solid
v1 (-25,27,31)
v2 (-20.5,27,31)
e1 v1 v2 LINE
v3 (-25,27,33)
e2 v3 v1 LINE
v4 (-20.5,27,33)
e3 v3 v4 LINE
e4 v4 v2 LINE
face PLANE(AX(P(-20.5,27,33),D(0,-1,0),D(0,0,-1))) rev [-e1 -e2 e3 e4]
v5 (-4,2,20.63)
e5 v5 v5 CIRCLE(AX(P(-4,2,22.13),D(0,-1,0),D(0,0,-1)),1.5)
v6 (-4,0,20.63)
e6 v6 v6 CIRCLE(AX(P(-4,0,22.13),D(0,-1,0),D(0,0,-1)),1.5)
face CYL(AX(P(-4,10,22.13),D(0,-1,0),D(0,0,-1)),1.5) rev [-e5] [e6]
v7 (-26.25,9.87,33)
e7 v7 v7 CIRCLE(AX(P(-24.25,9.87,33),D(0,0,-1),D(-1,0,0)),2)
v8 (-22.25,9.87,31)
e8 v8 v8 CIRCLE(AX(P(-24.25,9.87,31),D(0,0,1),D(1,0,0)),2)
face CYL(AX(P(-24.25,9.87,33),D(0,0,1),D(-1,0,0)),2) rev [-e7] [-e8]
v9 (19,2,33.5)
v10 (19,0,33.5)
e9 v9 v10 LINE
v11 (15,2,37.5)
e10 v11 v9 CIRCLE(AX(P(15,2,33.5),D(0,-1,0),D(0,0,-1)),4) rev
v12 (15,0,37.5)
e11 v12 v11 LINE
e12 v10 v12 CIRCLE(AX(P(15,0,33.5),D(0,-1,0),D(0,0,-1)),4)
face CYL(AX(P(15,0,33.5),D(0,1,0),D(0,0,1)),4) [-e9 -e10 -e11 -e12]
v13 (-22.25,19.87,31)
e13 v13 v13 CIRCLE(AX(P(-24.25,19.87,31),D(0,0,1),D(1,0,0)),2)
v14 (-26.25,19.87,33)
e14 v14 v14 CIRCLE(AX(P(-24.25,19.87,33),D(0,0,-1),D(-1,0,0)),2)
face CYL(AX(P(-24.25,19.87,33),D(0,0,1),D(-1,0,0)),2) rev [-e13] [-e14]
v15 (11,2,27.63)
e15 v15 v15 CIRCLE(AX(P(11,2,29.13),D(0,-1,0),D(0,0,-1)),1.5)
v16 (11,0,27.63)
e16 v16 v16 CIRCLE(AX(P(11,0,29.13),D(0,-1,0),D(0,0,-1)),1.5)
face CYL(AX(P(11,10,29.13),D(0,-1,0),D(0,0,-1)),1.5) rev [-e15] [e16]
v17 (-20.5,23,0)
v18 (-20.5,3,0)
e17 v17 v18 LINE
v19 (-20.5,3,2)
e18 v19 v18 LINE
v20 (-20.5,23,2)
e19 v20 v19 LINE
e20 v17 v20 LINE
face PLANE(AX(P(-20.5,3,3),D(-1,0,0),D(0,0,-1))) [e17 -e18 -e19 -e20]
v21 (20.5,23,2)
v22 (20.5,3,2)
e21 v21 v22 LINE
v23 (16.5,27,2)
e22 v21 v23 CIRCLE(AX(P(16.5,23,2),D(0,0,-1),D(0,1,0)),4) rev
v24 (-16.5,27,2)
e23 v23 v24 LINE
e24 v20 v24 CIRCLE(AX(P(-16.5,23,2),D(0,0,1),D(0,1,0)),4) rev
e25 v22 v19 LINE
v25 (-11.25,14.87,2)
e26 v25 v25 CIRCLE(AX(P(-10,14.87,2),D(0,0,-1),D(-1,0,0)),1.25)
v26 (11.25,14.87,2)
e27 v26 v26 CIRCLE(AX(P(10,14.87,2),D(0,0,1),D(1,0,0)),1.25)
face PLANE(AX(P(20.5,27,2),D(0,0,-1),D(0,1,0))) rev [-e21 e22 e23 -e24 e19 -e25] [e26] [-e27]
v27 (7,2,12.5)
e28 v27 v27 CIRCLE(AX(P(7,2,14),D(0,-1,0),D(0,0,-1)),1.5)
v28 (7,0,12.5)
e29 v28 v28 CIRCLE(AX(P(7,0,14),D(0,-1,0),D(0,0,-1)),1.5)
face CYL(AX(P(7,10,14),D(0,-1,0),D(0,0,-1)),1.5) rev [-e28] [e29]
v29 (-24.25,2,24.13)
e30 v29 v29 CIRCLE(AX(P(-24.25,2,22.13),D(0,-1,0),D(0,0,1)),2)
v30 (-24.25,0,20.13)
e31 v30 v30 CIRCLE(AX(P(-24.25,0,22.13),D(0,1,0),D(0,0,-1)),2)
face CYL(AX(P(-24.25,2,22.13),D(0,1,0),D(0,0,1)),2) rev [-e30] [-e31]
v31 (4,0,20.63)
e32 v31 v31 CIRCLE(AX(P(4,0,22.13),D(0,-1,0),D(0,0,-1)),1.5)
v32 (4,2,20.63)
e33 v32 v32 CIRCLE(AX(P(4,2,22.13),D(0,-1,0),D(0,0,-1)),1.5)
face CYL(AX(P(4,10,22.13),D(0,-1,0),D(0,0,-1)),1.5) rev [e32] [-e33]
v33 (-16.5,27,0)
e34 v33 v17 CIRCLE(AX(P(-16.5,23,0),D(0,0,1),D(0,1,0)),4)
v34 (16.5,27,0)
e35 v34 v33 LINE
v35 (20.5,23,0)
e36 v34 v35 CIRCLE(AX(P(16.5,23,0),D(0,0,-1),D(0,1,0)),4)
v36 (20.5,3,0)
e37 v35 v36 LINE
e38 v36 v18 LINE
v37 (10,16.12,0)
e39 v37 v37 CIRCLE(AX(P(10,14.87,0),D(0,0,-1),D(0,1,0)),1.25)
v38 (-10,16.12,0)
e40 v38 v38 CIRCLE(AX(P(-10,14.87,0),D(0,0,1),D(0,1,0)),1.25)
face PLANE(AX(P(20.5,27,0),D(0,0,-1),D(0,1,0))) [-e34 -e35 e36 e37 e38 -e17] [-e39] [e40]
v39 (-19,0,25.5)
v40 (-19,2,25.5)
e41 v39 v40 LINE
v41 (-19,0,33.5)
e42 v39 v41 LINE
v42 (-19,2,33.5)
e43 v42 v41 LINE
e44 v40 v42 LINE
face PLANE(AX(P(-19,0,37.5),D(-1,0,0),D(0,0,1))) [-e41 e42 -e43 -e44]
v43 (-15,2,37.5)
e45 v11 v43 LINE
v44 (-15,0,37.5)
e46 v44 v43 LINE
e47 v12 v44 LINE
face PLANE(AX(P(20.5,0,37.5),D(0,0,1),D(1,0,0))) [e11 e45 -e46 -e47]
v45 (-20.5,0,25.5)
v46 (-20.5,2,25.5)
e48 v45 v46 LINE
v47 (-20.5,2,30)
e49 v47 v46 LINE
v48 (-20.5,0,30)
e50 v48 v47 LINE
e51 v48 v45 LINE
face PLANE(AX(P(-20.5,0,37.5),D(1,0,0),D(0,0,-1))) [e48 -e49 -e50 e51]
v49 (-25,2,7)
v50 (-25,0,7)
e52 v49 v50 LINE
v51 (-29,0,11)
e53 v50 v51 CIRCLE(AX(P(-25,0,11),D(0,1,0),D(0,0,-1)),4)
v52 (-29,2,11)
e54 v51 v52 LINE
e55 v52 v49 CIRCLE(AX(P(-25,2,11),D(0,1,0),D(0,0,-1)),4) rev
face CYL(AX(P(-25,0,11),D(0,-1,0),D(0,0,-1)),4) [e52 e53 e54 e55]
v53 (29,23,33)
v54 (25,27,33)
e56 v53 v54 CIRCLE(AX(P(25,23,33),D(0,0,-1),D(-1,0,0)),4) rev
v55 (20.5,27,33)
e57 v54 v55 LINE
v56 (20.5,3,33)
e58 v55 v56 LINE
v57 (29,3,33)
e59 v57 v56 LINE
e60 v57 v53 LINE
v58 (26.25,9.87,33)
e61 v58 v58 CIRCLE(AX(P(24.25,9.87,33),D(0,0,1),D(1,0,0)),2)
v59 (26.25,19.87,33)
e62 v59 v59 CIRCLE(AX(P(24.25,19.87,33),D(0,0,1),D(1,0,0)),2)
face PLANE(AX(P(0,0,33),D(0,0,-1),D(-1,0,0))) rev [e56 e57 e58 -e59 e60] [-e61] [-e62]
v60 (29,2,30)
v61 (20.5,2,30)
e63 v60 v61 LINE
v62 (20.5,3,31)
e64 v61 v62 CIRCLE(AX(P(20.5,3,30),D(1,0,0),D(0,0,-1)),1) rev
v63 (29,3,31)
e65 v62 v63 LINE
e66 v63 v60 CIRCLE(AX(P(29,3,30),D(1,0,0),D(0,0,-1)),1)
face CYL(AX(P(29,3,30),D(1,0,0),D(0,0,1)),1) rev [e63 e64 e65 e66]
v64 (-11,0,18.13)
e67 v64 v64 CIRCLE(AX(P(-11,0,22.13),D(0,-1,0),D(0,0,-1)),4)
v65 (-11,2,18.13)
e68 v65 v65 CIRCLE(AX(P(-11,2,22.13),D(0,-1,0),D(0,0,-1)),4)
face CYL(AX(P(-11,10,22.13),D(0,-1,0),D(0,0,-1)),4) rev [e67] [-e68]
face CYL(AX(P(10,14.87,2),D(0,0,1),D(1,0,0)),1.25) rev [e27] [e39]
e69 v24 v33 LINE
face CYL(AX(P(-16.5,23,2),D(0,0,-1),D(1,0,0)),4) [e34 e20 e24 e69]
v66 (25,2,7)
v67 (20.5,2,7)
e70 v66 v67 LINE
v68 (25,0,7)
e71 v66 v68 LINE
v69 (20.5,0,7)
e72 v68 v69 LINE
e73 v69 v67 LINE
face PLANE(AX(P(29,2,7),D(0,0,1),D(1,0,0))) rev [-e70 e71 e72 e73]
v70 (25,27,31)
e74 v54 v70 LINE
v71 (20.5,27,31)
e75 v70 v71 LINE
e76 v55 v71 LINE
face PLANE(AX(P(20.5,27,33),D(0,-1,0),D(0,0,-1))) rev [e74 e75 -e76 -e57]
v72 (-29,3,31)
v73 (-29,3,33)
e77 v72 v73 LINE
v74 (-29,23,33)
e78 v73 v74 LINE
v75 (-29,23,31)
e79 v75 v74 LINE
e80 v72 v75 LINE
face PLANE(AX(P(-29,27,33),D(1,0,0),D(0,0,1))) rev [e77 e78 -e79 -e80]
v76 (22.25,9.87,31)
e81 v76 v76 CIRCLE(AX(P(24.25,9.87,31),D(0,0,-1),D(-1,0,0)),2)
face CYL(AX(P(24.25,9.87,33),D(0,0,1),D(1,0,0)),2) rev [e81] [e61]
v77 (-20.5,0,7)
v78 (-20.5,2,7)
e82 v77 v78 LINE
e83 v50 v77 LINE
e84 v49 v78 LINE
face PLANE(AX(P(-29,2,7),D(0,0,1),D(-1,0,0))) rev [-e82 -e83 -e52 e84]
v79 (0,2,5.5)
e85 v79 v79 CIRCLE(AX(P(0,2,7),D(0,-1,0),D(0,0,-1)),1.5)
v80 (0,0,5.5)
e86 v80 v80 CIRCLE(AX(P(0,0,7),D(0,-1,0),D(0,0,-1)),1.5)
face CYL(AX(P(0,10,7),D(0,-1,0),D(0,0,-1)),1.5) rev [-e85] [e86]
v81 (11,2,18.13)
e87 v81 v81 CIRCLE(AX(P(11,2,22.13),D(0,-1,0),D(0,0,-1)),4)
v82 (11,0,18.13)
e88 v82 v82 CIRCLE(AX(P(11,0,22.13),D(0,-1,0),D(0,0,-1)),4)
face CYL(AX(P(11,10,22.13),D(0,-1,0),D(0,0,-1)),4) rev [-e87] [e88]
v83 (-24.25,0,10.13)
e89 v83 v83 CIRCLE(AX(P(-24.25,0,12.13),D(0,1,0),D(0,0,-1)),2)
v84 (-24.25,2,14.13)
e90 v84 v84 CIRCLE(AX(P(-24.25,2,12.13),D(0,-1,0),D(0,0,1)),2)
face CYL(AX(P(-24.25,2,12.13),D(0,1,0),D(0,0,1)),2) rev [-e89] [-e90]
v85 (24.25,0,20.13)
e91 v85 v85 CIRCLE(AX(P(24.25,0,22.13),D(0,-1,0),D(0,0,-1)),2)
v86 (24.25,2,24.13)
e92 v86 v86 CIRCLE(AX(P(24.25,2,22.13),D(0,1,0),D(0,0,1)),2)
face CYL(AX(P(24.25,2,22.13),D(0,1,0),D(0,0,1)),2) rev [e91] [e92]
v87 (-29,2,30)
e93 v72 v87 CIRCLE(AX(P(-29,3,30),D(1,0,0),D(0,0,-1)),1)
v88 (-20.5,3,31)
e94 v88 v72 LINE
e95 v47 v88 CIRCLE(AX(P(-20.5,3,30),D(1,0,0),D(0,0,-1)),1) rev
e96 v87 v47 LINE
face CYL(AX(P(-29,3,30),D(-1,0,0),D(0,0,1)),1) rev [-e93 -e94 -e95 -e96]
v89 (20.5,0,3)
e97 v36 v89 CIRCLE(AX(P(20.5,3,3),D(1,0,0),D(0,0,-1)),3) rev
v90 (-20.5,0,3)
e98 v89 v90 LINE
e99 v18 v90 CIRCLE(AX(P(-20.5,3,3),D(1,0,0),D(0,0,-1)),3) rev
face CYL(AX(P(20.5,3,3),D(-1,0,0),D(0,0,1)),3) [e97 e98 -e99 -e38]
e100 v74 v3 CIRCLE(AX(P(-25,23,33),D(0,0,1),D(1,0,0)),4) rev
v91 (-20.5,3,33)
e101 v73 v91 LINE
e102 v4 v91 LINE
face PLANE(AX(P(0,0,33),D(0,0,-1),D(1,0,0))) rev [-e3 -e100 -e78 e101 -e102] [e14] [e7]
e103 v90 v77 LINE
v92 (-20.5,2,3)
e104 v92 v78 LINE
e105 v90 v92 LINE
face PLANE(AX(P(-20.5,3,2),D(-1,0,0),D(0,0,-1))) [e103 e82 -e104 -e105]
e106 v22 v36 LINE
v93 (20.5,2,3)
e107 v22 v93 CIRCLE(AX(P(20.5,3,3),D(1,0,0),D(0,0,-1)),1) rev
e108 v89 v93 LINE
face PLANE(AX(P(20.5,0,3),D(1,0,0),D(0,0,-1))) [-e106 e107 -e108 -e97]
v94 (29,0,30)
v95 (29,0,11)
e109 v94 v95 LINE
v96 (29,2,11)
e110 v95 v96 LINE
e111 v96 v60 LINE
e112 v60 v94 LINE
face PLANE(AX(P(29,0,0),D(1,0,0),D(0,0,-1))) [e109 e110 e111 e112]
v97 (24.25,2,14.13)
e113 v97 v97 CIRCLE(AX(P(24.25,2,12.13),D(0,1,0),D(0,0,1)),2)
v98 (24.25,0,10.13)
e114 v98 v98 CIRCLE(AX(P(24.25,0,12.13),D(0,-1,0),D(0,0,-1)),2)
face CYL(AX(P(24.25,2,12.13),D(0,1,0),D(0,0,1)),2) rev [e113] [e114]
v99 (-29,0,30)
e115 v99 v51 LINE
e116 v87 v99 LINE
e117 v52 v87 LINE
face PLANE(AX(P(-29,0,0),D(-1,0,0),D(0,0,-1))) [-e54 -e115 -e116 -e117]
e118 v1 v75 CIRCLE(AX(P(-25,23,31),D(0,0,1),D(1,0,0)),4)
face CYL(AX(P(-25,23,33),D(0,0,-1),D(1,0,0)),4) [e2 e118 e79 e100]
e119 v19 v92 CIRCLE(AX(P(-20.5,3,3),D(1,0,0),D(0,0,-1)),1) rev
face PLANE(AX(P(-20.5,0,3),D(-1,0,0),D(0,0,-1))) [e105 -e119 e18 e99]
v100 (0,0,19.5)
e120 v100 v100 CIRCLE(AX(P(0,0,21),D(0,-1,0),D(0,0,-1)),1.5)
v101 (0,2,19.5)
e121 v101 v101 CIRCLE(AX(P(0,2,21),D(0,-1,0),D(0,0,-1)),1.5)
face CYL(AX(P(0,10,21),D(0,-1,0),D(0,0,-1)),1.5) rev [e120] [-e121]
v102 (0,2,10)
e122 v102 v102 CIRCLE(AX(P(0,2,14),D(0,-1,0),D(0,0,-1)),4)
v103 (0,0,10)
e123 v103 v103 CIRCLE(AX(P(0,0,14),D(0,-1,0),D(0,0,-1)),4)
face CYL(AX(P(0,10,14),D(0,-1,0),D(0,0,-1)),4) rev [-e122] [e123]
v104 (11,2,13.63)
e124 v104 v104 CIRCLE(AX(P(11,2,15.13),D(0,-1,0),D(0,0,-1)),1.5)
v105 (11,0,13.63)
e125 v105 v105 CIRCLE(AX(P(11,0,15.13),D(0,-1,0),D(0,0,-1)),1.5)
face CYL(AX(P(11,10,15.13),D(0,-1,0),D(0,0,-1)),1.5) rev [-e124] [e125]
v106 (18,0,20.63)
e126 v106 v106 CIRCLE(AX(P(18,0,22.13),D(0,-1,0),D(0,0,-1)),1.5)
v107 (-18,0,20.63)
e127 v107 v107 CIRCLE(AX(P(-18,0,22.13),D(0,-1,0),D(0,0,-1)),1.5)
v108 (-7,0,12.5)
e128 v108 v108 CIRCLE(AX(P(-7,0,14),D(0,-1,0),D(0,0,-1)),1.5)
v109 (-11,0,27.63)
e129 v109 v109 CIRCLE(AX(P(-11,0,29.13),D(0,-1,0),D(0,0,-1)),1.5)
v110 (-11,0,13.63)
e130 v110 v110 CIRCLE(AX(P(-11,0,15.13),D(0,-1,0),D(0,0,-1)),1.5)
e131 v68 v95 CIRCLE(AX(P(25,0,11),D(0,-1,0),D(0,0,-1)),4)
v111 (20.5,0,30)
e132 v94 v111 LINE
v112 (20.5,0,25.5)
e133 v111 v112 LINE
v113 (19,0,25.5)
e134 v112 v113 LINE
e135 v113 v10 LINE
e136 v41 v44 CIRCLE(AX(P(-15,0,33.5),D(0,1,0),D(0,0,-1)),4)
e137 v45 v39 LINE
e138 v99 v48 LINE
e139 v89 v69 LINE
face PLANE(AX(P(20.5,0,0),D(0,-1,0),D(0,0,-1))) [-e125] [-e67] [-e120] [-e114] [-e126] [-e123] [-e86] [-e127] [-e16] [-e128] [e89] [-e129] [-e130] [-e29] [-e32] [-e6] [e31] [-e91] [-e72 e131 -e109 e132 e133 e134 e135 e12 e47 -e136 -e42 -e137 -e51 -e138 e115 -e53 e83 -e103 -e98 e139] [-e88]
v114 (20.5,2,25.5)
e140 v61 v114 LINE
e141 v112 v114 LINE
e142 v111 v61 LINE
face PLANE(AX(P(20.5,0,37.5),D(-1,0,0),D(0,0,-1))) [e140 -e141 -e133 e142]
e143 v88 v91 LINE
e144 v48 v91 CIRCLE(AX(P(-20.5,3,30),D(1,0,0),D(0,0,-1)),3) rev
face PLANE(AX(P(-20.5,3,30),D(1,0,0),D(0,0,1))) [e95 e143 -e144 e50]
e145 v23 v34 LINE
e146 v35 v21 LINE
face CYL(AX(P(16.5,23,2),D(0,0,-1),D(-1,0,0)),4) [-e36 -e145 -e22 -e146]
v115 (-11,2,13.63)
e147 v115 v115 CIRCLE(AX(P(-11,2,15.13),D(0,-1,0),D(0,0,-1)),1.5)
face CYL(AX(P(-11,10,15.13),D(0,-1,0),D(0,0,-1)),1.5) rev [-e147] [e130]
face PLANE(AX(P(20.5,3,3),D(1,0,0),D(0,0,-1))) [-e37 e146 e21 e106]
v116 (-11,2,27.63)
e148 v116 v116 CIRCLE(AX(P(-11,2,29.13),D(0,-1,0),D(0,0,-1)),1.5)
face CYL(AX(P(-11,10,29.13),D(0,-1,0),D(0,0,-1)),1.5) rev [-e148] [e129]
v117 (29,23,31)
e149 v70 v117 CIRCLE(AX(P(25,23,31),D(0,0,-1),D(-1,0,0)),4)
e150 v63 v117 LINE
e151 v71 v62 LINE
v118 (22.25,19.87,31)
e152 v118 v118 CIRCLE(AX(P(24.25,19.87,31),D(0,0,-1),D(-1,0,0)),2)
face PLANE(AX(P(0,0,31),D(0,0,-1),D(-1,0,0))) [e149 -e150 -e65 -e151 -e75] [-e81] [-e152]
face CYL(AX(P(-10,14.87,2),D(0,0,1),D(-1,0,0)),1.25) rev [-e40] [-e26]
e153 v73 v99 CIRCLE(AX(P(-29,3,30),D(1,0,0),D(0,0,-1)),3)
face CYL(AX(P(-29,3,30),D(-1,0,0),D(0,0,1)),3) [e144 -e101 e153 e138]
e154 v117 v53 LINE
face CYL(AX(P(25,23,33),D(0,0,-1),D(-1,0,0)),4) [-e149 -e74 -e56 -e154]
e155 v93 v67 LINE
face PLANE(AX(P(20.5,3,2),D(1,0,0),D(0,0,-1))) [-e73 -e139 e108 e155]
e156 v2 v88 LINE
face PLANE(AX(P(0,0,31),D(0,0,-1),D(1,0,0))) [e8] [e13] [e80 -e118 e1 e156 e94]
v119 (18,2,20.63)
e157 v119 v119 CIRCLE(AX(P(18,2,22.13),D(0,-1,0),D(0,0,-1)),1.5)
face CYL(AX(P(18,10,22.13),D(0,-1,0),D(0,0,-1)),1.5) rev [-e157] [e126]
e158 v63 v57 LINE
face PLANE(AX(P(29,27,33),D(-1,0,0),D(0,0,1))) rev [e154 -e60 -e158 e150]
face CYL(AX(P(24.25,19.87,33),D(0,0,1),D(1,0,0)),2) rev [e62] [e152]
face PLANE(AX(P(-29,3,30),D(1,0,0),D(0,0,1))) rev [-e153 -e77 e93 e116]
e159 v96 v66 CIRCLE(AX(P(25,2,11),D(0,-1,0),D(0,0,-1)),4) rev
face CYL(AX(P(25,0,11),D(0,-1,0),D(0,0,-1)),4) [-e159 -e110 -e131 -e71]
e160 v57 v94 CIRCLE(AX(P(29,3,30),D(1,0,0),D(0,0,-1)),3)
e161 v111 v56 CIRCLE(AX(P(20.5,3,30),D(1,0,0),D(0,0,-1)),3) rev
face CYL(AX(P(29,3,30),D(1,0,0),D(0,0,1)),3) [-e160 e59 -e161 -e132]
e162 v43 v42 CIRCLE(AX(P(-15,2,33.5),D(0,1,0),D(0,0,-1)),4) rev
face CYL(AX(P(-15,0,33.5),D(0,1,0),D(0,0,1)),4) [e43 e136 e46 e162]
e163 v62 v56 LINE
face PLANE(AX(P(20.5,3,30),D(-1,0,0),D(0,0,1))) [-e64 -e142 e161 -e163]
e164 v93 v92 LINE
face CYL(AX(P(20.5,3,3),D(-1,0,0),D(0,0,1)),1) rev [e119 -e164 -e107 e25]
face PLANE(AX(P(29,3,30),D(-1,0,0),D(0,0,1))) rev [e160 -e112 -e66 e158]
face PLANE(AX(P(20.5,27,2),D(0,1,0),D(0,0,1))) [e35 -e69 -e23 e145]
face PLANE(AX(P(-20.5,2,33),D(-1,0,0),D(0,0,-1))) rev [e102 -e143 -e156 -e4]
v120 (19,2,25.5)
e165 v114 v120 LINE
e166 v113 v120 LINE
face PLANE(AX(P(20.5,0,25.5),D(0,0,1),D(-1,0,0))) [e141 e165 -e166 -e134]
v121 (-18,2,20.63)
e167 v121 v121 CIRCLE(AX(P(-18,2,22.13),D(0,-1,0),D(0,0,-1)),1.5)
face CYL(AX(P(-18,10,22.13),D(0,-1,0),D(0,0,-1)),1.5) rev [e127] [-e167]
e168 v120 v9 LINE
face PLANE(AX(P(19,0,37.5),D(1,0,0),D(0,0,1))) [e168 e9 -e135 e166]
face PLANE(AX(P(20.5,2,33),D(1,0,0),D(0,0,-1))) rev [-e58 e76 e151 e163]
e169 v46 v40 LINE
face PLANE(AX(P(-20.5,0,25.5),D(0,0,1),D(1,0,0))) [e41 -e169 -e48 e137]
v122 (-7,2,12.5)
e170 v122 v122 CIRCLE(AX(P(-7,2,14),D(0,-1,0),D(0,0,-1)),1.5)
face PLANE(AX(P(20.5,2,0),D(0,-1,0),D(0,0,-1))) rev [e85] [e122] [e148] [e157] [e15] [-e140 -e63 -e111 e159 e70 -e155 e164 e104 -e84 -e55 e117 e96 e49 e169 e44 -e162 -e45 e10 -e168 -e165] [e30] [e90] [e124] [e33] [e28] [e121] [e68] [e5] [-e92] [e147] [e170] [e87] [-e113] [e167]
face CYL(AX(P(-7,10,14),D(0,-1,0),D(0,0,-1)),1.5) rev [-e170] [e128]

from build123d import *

# Parameters (mm, degrees)
T_LE_DE_BASE_PLI_E1_DEPTH             = 20.5
ESQUISSE8_W                           = 24
ESQUISSE8_H                           = 2
BOSS_EXTRU_1_DEPTH                    = 8.5
T_LE_PLI_E_SUR_AR_TE1_STRIP_W         = 10
T_LE_PLI_E_SUR_AR_TE1_STRIP_H         = 2
T_LE_PLI_E_SUR_AR_TE1_STRIP_CUT_DEPTH = 8.5
T_LE_PLI_E_SUR_AR_TE1_DEPTH           = 8.5
ESQUISSE12_W                          = 1.5
ESQUISSE12_H                          = 12
ENL_V_MAT_EXTRU_1_DEPTH               = 8.5
DIAM_TRE_DU_PER_AGE_4_0_4_1_D         = 4
DIAM_TRE_DU_PER_AGE_4_0_4_2_D         = 4
DIAM_TRE_DU_PER_AGE_2_5_2_5_2_D       = 2.5
CONG_1_R                              = 4
SKETCH1_R                             = 4
SKETCH1_R_2                           = 1.5
CUT_EXTRUDE1_DEPTH                    = 10


# Sheet-metal steps are written as plain solids
with BuildPart() as part:
    # Esquisse1 → Tôle de base pliée1 (new body)
    with BuildSketch(Plane(origin=(0, 0, 0), x_dir=(0, 0, -1), z_dir=(1, 0, 0))):
        with BuildLine():
            Line((0, 27), (0, 3))
            ThreePointArc((0, 3), (-0.878679656, 0.878679656), (-3, 0))
            Line((-3, 0), (-37.5, 0))
            Line((-37.5, 0), (-37.5, 2))
            Line((-37.5, 2), (-3, 2))
            ThreePointArc((-3, 2), (-2.292893219, 2.292893219), (-2, 3))
            Line((-2, 3), (-2, 27))
            Line((-2, 27), (0, 27))
        make_face()
    extrude(amount=T_LE_DE_BASE_PLI_E1_DEPTH)

    # Esquisse8 → Boss.-Extru.1 (add)
    with BuildSketch(Plane(origin=(20.5, 0, 0), x_dir=(0, 0, -1), z_dir=(1, 0, 0))):
        with Locations((-19, 1)):
            Rectangle(ESQUISSE8_W, ESQUISSE8_H)
    extrude(amount=BOSS_EXTRU_1_DEPTH)

    # Tôle pliée sur arête1 strip (across the edge) → Tôle pliée sur arête1 strip cut (cut)
    with BuildSketch(Plane(origin=(20.5, 2, 31), x_dir=(0, 0, -1), z_dir=(1, 0, 0))):
        with Locations((-4, -1)):
            Rectangle(T_LE_PLI_E_SUR_AR_TE1_STRIP_W, T_LE_PLI_E_SUR_AR_TE1_STRIP_H)
    extrude(amount=T_LE_PLI_E_SUR_AR_TE1_STRIP_CUT_DEPTH, mode=Mode.SUBTRACT)

    # Tôle pliée sur arête1 section (across the edge) → Tôle pliée sur arête1 (add)
    with BuildSketch(Plane(origin=(20.5, 2, 31), x_dir=(0, 0, -1), z_dir=(1, 0, 0))):
        with BuildLine():
            Line((-2, 1), (-2, 25))
            Line((-2, 25), (0, 25))
            Line((0, 25), (0, 1))
            ThreePointArc((0, 1), (0.292893219, 0.292893219), (1, 0))
            Line((1, 0), (1, -2))
            ThreePointArc((1, -2), (-1.121320344, -1.121320344), (-2, 1))
        make_face()
    extrude(amount=T_LE_PLI_E_SUR_AR_TE1_DEPTH)

    # Esquisse12 → Enlèv. mat.-Extru.1 (cut)
    with BuildSketch(Plane(origin=(0, 2, 0), x_dir=(1, 0, 0), z_dir=(0, 1, 0))):
        with Locations((19.75, -31.5)):
            Rectangle(ESQUISSE12_W, ESQUISSE12_H)
    extrude(amount=-ENL_V_MAT_EXTRU_1_DEPTH, mode=Mode.SUBTRACT)

    # Diamètre du perçage Ø4.0 (4)1 (through all)
    with Locations(Plane(origin=(0, 2, 0), x_dir=(1, 0, 0), z_dir=(0, 1, 0))):
        with Locations((24.25, -12.13), (24.25, -22.13)):
            Hole(DIAM_TRE_DU_PER_AGE_4_0_4_1_D / 2)

    # Diamètre du perçage Ø4.0 (4)2 (through all)
    with Locations(Plane.XY.offset(33)):
        with Locations((24.25, 19.87), (24.25, 9.87)):
            Hole(DIAM_TRE_DU_PER_AGE_4_0_4_2_D / 2)

    # Diamètre du perçage Ø2.5 (2.5)2 (through all)
    with Locations(Plane.XY.offset(2)):
        with Locations((10, 14.87)):
            Hole(DIAM_TRE_DU_PER_AGE_2_5_2_5_2_D / 2)

    # Congé1
    cong_1_edges = [part.edges().sort_by_distance(p)[0] for p in [
        (20.5, 27, 1),
        (29, 1, 7),
        (29, 27, 32),
        (19, 1, 37.5),
    ]]
    fillet(cong_1_edges, radius=CONG_1_R)

    # Symétrie1: part across plane


with BuildPart() as part_1:
    add(part.part)
    add(part.part.mirror(Plane(origin=(0, 3, 3), x_dir=(0, 0, 1), z_dir=(1, 0, 0))))

    # Sketch1 → Cut-Extrude1 (cut)
    with BuildSketch(Plane.XZ):
        with Locations(Location((0, 14, 0), (0, 0, 270))):
            Circle(SKETCH1_R)
        with Locations(Location((11, 22.13, 0), (0, 0, 270))):
            Circle(SKETCH1_R)
        with Locations(Location((-11, 22.13, 0), (0, 0, 270))):
            Circle(SKETCH1_R)
        with Locations(Location((4, 22.13, 0), (0, 0, 270))):
            Circle(SKETCH1_R_2)
        with Locations(Location((11, 29.13, 0), (0, 0, 270))):
            Circle(SKETCH1_R_2)
        with Locations(Location((18, 22.13, 0), (0, 0, 270))):
            Circle(SKETCH1_R_2)
        with Locations(Location((11, 15.13, 0), (0, 0, 270))):
            Circle(SKETCH1_R_2)
        with Locations(Location((-18, 22.13, 0), (0, 0, 270))):
            Circle(SKETCH1_R_2)
        with Locations(Location((0, 7, 0), (0, 0, 270))):
            Circle(SKETCH1_R_2)
        with Locations(Location((-11, 29.13, 0), (0, 0, 270))):
            Circle(SKETCH1_R_2)
        with Locations(Location((-4, 22.13, 0), (0, 0, 270))):
            Circle(SKETCH1_R_2)
        with Locations(Location((-11, 15.13, 0), (0, 0, 270))):
            Circle(SKETCH1_R_2)
        with Locations(Location((-7, 14, 0), (0, 0, 270))):
            Circle(SKETCH1_R_2)
        with Locations(Location((0, 21, 0), (0, 0, 270))):
            Circle(SKETCH1_R_2)
        with Locations(Location((7, 14, 0), (0, 0, 270))):
            Circle(SKETCH1_R_2)
    extrude(amount=-CUT_EXTRUDE1_DEPTH, mode=Mode.SUBTRACT)


solid = part_1.part
